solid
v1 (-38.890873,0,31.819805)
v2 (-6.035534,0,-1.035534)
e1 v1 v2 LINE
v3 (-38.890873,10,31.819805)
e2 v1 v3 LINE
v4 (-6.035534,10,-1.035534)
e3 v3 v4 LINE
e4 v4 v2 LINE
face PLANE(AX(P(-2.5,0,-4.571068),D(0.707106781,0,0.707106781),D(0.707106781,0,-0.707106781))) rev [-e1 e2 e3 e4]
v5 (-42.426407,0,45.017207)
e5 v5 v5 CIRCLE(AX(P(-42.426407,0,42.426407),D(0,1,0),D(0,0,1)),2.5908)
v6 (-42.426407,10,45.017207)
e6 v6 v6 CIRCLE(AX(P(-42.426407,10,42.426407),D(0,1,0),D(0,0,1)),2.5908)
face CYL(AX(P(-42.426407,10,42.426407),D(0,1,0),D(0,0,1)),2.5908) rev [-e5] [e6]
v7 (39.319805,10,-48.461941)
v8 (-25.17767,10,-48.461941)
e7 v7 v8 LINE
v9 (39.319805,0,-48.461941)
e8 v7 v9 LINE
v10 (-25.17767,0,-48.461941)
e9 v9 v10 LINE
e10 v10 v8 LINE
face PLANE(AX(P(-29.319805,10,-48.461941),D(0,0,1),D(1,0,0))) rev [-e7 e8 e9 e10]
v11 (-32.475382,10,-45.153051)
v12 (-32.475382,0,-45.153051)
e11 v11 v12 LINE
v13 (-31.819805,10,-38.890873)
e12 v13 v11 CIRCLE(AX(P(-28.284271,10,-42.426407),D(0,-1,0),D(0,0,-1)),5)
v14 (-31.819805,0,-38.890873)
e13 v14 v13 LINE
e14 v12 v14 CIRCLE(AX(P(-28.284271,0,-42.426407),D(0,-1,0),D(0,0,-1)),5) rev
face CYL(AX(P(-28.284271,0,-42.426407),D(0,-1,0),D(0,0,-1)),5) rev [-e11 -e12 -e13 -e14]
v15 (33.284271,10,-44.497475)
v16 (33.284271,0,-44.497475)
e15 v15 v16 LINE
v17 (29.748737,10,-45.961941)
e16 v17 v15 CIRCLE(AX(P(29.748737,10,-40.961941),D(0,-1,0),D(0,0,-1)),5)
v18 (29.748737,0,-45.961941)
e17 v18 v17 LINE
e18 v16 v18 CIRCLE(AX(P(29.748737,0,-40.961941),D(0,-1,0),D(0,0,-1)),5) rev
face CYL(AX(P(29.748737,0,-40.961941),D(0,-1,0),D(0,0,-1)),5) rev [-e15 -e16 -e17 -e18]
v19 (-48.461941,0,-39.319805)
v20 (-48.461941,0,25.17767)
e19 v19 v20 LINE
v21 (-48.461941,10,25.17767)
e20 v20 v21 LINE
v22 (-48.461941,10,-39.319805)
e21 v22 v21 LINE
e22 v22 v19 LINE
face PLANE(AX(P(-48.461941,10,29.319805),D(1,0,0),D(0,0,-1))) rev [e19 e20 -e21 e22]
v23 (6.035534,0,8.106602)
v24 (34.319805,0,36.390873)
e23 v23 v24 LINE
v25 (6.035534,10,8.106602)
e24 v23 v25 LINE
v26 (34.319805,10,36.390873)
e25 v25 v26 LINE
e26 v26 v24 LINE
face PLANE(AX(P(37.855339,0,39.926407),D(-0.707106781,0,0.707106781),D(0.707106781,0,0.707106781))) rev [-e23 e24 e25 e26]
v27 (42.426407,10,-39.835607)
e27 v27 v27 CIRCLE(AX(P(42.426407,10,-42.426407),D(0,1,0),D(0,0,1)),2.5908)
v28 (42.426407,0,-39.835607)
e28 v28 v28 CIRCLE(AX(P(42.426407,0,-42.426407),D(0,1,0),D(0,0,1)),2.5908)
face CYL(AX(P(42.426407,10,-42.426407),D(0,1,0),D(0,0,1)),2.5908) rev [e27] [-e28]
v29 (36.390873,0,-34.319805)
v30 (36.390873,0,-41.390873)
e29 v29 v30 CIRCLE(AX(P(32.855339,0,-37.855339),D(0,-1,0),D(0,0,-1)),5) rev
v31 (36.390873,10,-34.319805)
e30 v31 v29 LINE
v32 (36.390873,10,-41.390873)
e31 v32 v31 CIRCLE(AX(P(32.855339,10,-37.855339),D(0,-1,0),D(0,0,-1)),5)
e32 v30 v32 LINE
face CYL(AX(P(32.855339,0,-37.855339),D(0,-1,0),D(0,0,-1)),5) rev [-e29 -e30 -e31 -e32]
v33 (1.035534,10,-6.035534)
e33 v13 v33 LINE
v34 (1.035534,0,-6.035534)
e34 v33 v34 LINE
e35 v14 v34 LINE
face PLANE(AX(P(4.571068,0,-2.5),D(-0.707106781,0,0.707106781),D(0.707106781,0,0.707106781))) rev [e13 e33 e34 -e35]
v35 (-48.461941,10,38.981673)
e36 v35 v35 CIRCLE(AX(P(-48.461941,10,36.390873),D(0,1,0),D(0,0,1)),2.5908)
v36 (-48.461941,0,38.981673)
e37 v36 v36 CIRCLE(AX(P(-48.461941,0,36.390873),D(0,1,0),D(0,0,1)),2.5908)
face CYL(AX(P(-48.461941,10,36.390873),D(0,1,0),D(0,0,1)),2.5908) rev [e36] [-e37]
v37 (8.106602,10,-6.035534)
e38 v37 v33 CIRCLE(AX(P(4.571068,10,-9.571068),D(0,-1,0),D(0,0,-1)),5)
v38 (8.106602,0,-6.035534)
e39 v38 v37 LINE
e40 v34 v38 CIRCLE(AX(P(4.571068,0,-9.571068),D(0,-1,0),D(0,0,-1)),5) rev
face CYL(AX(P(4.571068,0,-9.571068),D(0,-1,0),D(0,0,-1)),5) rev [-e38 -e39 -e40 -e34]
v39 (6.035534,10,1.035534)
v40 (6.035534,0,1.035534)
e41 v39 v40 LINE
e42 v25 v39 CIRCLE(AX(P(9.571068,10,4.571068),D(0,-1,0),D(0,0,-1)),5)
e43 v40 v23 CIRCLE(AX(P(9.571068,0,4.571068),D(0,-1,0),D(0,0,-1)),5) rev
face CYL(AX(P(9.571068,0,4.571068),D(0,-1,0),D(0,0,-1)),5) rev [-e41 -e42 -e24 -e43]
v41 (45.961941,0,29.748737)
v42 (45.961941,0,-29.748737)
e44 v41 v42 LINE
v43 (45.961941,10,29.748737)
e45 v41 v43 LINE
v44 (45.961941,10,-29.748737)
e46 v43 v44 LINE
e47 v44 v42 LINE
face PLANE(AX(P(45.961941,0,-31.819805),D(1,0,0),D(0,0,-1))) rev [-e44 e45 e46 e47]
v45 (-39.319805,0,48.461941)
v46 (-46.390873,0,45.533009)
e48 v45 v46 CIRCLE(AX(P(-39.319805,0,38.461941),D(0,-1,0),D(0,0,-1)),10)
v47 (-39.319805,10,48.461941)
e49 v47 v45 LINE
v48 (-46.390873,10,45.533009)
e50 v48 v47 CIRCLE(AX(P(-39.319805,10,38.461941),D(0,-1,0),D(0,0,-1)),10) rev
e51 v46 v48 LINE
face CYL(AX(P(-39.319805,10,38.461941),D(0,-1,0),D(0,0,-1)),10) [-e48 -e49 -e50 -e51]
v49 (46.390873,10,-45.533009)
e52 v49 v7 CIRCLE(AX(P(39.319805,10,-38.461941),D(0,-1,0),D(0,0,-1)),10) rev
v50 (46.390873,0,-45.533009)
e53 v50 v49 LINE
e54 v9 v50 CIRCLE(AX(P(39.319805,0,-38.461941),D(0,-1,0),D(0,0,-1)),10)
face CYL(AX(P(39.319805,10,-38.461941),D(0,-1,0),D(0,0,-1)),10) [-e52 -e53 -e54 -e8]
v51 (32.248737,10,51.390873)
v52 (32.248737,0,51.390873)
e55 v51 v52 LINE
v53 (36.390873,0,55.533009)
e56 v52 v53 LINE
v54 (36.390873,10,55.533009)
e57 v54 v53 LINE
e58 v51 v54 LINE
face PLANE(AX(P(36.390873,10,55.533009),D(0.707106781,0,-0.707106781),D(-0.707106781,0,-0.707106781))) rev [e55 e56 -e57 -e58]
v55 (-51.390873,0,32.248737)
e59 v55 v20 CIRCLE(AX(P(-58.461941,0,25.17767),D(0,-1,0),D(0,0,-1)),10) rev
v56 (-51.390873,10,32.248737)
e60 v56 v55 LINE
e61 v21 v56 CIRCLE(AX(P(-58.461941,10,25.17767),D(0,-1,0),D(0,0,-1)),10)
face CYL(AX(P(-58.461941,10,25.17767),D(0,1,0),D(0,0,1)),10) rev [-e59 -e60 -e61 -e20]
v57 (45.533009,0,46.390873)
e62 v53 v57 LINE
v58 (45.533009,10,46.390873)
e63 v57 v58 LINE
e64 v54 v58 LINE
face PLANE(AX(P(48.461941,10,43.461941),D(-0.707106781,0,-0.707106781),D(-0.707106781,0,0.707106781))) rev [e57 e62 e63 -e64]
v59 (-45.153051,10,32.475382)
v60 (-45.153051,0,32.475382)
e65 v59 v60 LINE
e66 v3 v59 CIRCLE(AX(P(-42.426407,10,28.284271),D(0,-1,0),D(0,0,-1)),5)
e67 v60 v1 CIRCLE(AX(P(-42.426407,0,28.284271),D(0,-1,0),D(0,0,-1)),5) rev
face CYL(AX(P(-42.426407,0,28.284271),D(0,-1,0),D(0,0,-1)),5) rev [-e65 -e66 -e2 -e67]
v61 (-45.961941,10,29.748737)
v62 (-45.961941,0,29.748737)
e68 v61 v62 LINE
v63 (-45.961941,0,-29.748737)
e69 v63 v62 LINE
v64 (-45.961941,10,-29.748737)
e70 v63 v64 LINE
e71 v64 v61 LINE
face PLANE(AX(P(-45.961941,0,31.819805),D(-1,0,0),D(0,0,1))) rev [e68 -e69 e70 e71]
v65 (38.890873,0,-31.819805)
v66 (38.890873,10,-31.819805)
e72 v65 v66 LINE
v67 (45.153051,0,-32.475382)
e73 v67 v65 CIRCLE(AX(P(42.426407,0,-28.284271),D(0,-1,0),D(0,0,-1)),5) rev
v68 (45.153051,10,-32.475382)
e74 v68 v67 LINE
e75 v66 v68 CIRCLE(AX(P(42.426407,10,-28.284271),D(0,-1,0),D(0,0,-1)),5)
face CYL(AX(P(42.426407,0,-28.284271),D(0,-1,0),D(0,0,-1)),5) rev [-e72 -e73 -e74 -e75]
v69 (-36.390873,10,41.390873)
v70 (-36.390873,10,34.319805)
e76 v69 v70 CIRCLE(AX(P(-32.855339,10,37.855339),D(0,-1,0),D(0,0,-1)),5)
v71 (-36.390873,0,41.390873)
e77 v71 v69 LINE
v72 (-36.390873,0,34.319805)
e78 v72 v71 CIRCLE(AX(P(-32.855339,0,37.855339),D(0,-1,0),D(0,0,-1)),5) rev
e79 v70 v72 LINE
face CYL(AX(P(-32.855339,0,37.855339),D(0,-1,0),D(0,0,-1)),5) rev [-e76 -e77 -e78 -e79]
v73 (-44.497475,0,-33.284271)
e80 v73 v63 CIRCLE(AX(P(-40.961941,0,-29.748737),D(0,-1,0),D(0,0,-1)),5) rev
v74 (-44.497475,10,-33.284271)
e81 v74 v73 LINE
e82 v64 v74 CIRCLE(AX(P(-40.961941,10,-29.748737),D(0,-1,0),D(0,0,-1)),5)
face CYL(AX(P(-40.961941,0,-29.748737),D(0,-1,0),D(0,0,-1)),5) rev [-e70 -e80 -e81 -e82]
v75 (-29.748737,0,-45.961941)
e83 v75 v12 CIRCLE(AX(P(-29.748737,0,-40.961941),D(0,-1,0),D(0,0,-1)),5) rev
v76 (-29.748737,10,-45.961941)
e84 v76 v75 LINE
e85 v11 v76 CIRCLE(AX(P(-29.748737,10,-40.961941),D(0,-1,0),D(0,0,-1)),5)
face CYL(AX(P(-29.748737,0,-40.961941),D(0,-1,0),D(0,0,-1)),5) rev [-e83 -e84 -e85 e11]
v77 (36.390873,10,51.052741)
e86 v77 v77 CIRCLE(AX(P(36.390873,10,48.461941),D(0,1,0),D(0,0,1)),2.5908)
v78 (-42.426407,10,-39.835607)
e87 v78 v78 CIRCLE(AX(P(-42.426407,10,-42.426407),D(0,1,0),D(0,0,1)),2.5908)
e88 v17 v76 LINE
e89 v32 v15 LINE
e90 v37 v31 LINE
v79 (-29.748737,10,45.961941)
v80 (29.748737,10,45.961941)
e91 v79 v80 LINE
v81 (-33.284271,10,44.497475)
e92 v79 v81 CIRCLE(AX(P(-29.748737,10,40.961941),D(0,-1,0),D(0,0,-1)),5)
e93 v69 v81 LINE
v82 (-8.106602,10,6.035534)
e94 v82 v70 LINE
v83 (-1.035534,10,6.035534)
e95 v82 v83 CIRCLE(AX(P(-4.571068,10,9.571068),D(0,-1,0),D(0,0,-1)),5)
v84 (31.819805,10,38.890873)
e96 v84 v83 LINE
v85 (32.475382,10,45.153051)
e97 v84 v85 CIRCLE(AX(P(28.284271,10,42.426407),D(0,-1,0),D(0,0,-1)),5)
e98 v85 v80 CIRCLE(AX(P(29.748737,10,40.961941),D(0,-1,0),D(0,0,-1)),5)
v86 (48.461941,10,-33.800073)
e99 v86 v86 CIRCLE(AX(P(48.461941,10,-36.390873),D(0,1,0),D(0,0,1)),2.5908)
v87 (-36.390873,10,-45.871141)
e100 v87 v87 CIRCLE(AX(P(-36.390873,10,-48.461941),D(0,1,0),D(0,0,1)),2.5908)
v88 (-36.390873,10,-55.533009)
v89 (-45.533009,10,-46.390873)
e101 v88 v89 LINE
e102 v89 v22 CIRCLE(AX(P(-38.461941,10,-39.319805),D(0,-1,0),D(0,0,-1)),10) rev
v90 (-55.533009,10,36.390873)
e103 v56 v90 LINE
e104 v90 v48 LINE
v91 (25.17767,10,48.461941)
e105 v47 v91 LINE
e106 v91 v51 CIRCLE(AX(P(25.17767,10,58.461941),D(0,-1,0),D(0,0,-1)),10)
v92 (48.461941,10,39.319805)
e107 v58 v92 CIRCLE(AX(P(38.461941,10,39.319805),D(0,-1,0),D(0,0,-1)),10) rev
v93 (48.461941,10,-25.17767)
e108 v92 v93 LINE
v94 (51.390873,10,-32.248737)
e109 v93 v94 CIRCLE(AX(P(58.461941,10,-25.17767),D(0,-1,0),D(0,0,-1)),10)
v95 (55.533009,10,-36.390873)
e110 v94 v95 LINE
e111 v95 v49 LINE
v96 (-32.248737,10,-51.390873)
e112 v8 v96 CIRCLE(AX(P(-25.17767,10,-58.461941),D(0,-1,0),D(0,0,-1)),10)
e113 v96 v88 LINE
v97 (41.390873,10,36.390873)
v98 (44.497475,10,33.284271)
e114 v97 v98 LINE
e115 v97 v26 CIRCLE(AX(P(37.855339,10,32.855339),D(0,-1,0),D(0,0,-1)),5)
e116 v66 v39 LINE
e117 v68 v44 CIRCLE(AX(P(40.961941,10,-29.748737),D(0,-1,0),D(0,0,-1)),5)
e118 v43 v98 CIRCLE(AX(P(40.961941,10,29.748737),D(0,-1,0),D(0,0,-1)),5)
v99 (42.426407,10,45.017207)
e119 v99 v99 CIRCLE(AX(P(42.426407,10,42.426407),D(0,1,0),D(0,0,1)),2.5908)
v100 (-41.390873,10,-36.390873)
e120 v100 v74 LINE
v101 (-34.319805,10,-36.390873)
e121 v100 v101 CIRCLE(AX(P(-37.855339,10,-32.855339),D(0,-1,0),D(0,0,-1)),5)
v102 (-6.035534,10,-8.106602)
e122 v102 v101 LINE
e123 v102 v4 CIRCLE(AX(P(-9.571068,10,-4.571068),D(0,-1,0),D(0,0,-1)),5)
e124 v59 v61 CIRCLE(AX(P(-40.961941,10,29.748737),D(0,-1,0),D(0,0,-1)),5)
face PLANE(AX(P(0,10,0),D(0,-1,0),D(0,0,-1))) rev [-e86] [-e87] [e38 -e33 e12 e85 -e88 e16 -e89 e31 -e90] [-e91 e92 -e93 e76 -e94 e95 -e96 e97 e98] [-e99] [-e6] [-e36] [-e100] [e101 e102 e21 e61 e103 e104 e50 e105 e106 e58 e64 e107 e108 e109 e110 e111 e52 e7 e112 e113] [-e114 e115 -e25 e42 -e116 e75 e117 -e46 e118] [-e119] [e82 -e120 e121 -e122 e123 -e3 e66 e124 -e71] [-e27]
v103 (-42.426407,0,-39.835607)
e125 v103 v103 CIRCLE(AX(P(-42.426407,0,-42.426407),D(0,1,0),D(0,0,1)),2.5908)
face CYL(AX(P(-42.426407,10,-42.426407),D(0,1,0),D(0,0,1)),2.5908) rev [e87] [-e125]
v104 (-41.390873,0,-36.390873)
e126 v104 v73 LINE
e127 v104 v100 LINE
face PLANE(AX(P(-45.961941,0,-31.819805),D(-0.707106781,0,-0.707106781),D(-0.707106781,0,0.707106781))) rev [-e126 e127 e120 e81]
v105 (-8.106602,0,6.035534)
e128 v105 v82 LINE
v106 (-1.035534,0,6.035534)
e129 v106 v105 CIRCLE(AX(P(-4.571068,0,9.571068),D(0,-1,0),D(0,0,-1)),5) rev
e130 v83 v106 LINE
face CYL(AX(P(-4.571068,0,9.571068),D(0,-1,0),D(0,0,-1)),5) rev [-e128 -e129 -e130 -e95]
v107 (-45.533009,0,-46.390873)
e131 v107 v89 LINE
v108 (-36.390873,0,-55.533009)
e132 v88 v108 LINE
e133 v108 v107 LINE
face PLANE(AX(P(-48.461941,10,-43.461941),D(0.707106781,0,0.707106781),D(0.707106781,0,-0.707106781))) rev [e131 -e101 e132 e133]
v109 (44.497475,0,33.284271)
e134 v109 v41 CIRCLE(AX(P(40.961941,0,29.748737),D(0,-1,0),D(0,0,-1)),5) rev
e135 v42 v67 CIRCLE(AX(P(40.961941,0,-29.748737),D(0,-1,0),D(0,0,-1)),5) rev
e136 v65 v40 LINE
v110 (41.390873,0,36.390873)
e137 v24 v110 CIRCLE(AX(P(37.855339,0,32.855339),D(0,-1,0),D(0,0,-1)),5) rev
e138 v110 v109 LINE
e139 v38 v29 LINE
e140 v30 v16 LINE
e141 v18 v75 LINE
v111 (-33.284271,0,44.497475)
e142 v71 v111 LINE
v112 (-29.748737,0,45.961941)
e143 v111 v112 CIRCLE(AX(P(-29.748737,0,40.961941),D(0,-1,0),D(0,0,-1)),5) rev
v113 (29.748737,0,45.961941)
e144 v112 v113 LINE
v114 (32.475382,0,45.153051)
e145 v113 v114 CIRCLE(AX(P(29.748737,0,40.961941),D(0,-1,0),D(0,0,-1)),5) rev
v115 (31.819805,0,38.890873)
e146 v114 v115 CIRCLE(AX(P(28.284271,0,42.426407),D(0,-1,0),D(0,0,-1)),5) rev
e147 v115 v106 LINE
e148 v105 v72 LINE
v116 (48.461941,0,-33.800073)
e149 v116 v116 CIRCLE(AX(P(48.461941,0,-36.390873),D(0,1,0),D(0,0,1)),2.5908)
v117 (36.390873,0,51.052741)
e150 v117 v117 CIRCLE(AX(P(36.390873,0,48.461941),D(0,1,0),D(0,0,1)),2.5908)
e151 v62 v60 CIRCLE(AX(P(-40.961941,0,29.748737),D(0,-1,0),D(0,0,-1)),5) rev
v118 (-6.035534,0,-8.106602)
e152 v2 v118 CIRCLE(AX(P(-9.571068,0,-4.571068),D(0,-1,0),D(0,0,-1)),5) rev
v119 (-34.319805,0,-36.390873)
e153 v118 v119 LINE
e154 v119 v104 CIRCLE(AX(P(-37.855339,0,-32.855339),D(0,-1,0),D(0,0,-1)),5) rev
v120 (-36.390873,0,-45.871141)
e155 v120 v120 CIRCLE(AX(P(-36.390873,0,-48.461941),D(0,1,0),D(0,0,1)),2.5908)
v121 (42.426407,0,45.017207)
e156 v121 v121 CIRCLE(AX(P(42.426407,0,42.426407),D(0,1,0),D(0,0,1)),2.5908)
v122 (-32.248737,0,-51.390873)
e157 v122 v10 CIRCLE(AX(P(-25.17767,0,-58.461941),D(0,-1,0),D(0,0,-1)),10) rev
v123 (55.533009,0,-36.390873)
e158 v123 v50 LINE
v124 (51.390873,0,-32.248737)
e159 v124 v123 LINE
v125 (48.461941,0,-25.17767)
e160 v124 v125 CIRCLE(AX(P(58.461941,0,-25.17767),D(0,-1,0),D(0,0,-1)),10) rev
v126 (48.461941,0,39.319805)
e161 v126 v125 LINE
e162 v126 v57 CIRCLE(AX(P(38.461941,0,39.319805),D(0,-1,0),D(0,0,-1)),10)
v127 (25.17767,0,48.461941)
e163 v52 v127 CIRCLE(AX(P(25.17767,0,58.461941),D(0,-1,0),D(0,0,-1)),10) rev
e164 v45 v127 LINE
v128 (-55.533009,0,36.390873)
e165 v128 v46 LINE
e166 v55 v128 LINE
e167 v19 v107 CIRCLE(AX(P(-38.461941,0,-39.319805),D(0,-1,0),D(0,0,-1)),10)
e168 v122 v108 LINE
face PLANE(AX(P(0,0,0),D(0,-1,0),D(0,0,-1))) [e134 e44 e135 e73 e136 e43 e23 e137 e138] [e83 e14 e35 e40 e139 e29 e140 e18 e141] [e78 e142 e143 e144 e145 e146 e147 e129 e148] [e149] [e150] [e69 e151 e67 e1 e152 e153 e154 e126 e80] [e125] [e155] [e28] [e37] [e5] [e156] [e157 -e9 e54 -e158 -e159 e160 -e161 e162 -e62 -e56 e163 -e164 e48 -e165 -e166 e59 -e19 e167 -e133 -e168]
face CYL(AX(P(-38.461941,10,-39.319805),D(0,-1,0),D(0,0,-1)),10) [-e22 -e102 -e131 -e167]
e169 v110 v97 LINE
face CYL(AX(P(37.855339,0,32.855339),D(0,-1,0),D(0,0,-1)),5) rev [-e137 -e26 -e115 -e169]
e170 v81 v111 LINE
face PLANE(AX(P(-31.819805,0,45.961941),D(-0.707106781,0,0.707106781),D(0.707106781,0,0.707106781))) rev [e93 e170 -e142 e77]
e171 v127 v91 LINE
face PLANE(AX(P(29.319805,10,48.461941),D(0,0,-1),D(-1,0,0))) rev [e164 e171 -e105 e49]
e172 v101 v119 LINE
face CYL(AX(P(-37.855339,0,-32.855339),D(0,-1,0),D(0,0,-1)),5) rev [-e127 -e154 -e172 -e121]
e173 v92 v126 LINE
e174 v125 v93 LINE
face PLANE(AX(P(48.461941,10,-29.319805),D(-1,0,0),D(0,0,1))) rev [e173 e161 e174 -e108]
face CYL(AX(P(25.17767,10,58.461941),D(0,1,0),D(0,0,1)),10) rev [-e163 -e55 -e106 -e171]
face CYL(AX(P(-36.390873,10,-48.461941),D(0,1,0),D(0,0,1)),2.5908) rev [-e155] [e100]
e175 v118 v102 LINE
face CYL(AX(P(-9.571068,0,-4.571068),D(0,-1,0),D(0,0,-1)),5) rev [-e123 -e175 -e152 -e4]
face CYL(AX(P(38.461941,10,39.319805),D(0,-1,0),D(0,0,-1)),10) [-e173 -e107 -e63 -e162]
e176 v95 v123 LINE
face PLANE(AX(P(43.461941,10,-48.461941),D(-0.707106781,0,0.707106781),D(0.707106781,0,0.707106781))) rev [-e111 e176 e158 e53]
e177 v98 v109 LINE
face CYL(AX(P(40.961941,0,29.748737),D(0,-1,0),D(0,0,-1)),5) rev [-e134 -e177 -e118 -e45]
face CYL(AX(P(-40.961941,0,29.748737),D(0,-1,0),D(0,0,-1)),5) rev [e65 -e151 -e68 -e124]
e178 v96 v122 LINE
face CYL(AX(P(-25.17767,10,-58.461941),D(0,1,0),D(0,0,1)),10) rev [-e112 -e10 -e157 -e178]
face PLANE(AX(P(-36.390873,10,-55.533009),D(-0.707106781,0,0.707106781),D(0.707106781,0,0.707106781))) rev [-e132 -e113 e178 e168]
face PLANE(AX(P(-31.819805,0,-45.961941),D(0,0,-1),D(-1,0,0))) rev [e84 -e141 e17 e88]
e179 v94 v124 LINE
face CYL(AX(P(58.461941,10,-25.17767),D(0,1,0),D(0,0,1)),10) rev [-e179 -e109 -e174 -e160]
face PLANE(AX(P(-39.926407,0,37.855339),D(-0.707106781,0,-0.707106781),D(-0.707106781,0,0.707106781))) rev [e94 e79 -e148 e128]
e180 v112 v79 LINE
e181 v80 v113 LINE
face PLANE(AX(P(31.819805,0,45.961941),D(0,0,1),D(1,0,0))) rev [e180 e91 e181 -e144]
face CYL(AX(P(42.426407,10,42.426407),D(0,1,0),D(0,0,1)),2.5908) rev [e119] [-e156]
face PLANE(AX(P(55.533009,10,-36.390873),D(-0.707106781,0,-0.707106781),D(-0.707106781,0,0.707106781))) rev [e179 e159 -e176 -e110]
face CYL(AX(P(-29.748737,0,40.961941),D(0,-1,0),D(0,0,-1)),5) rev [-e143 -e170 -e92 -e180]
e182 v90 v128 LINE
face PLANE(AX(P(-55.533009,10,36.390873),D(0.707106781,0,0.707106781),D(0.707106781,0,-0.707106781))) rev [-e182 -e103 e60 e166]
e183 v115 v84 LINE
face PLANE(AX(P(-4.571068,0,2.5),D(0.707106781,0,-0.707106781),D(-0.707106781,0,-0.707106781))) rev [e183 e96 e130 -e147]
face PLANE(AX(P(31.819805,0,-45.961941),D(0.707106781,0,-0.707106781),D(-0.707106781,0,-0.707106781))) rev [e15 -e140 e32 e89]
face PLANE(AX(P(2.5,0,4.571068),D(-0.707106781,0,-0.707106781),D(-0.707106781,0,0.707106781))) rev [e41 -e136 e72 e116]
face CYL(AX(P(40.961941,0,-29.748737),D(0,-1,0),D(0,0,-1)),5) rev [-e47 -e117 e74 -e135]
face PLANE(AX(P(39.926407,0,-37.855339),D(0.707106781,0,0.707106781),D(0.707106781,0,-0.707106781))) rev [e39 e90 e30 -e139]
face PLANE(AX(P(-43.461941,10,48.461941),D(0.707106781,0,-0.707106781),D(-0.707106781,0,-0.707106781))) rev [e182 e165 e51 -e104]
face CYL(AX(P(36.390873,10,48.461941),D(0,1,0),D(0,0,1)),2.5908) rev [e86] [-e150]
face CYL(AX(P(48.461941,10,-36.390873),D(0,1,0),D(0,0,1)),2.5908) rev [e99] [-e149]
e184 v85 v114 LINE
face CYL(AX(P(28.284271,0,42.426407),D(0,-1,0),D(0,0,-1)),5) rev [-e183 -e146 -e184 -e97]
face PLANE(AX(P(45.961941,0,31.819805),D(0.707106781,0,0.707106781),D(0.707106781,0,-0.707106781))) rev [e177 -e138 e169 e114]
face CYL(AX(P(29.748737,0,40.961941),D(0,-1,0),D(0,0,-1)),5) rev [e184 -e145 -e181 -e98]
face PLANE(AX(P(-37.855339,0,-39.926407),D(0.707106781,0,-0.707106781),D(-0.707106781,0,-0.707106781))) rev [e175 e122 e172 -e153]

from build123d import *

# Parameters (mm, degrees)
BOSS_EXTRUDE1_DEPTH        = 10
CUT_EXTRUDE1_DEPTH         = 80.169628557
FILLET4_R                  = 5
CIRPATTERN6_COUNT          = 4
FILLET4_OF_CIRPATTERN6_R   = 5
FILLET5_R                  = 10
F_6_0_204_DIAMETER_HOLE1_D = 5.1816
CIRPATTERN7_COUNT          = 4


with BuildPart() as part:
    # Sketch1 → Boss-Extrude1 (new body)
    with BuildSketch(Plane(origin=(0, 0, 0), x_dir=(1, 0, 0), z_dir=(0, 1, 0))):
        Polygon((-48.461940777, 43.461940777), (-36.390872965, 55.533008589), (-29.319805153, 48.461940777), (43.461940777, 48.461940777), (55.533008589, 36.390872965), (48.461940777, 29.319805153), (48.461940777, -43.461940777), (36.390872965, -55.533008589), (29.319805153, -48.461940777), (-43.461940777, -48.461940777), (-55.533008589, -36.390872965), (-48.461940777, -29.319805153), align=None)
    extrude(amount=BOSS_EXTRUDE1_DEPTH)

    # Sketch2 → Cut-Extrude1 (cut, through all)
    with BuildSketch(Plane(origin=(0, 10, 0), x_dir=(1, 0, 0), z_dir=(0, 1, 0))):
        Polygon((-2.5, 4.571067812), (-42.426406871, -35.355339059), (-45.961940777, -31.819805153), (-45.961940777, 31.819805153), (-37.855339059, 39.926406871), align=None)
    cut_extrude1 = extrude(amount=-CUT_EXTRUDE1_DEPTH, mode=Mode.SUBTRACT)

    # Fillet4
    # the kernel refuses this fillet: 5 mm, written as the material it adds along each edge
    with BuildSketch(Plane(origin=(-37.855339059, 10, -39.926406871), x_dir=(-0.7071067811865468, 0, 0.7071067811865482), z_dir=(0, -1, 0)), Plane(origin=(-2.5, 10, -4.571067812), x_dir=(-0.7071067811865471, 0, -0.707106781186548), z_dir=(0, -1, 0))) as fillet4_piece_1:
        with BuildLine():
            CenterArc((FILLET4_R, -FILLET4_R), FILLET4_R, 90, 90)
            Line((0, -FILLET4_R), (0, 0))
            Line((0, 0), (FILLET4_R, 0))
        make_face()
    extrude(amount=10)
    with BuildSketch(Plane(origin=(-45.961940777, 10, 31.819805153), x_dir=(0.7071067811865467, 0, 0.7071067811865483), z_dir=(0, -1, 0)), Plane(origin=(-45.961940777, 10, -31.819805153), x_dir=(0, 0, 1), z_dir=(0, -1, 0))) as fillet4_piece_2:
        with BuildLine():
            CenterArc((FILLET4_R * 0.414213562373, -FILLET4_R), FILLET4_R, 90, 45)
            Line((-FILLET4_R * 0.292893218813, -FILLET4_R * 0.292893218813), (0, 0))
            Line((0, 0), (FILLET4_R * 0.414213562373, 0))
        make_face()
    extrude(amount=10)
    with BuildSketch(Plane(origin=(-42.426406871, 10, 35.355339059), x_dir=(-0.707106781186546, 0, -0.7071067811865489), z_dir=(0, -1, 0))) as fillet4_piece_3:
        with BuildLine():
            CenterArc((FILLET4_R, FILLET4_R), FILLET4_R, 180, 90)
            Line((0, FILLET4_R), (0, 0))
            Line((0, 0), (FILLET4_R, 0))
        make_face()
    extrude(amount=10)

    # CirPattern6: Cut-Extrude1 ×4 about axis
    cirpattern6_axis = Axis((0, 0, 0), (0, 1, 0))
    for i in range(1, CIRPATTERN6_COUNT):
        add(cut_extrude1.rotate(cirpattern6_axis, i * 360 / CIRPATTERN6_COUNT), mode=Mode.SUBTRACT)

    # Fillet4 of CirPattern6
    # the kernel refuses this fillet: 5 mm, written as the material it adds along each edge
    with BuildSketch(Plane(origin=(-39.926406871, 10, 37.855339059), x_dir=(0.7071067811865476, 0, -0.7071067811865476), z_dir=(0, -1, 0)), Plane(origin=(37.855339059, 10, 39.926406871), x_dir=(-0.7071067811865475, 0, -0.7071067811865475), z_dir=(0, -1, 0)), Plane(origin=(39.926406871, 10, -37.855339059), x_dir=(-0.7071067811865476, 0, 0.7071067811865476), z_dir=(0, -1, 0)), Plane(origin=(-35.355339059, 10, -42.426406871), x_dir=(0.7071067811865486, 0, -0.7071067811865465), z_dir=(0, -1, 0))) as fillet4_of_cirpattern6_piece_1:
        with BuildLine():
            CenterArc((FILLET4_OF_CIRPATTERN6_R, FILLET4_OF_CIRPATTERN6_R), FILLET4_OF_CIRPATTERN6_R, 180, 90)
            Line((0, FILLET4_OF_CIRPATTERN6_R), (0, 0))
            Line((0, 0), (FILLET4_OF_CIRPATTERN6_R, 0))
        make_face()
    extrude(amount=10)
    with BuildSketch(Plane(origin=(-4.571067812, 10, 2.5), x_dir=(-0.707106781186548, 0, 0.7071067811865469), z_dir=(0, -1, 0)), Plane(origin=(35.355339059, 10, 42.426406871), x_dir=(-0.7071067811865479, 0, -0.7071067811865471), z_dir=(0, -1, 0)), Plane(origin=(2.5, 10, 4.571067812), x_dir=(0.7071067811865474, 0, 0.7071067811865478), z_dir=(0, -1, 0)), Plane(origin=(42.426406871, 10, -35.355339059), x_dir=(-0.7071067811865471, 0, 0.7071067811865479), z_dir=(0, -1, 0)), Plane(origin=(4.571067812, 10, -2.5), x_dir=(0.7071067811865478, 0, -0.7071067811865472), z_dir=(0, -1, 0))) as fillet4_of_cirpattern6_piece_2:
        with BuildLine():
            CenterArc((FILLET4_OF_CIRPATTERN6_R, -FILLET4_OF_CIRPATTERN6_R), FILLET4_OF_CIRPATTERN6_R, 90, 90)
            Line((0, -FILLET4_OF_CIRPATTERN6_R), (0, 0))
            Line((0, 0), (FILLET4_OF_CIRPATTERN6_R, 0))
        make_face()
    extrude(amount=10)
    with BuildSketch(Plane(origin=(31.819805153, 10, 45.961940777), x_dir=(-1, 0, 0), z_dir=(0, -1, 0)), Plane(origin=(-31.819805153, 10, 45.961940777), x_dir=(-0.7071067811865483, 0, -0.7071067811865467), z_dir=(0, -1, 0)), Plane(origin=(45.961940777, 10, -31.819805153), x_dir=(0, 0, 1), z_dir=(0, -1, 0)), Plane(origin=(45.961940777, 10, 31.819805153), x_dir=(-0.7071067811865458, 0, 0.7071067811865492), z_dir=(0, -1, 0)), Plane(origin=(-31.819805153, 10, -45.961940777), x_dir=(1, 0, 0), z_dir=(0, -1, 0)), Plane(origin=(31.819805153, 10, -45.961940777), x_dir=(0.7071067811865492, 0, 0.7071067811865458), z_dir=(0, -1, 0))) as fillet4_of_cirpattern6_piece_3:
        with BuildLine():
            CenterArc((FILLET4_OF_CIRPATTERN6_R * 0.414213562373, FILLET4_OF_CIRPATTERN6_R), FILLET4_OF_CIRPATTERN6_R, 225, 45)
            Line((-FILLET4_OF_CIRPATTERN6_R * 0.292893218813, FILLET4_OF_CIRPATTERN6_R * 0.292893218813), (0, 0))
            Line((0, 0), (FILLET4_OF_CIRPATTERN6_R * 0.414213562373, 0))
        make_face()
    extrude(amount=10)

    # Fillet5
    fillet5_edges = [part.edges().sort_by_distance(p)[0] for p in [
        (-48.461940777, 5, -43.461940777),
        (-29.319805153, 5, -48.461940777),
        (43.461940777, 5, -48.461940777),
        (48.461940777, 5, -29.319805153),
        (48.461940777, 5, 43.461940777),
        (29.319805153, 5, 48.461940777),
        (-43.461940777, 5, 48.461940777),
        (-48.461940777, 5, 29.319805153),
    ]]
    fillet(fillet5_edges, radius=FILLET5_R)

    # #6 (0.204) Diameter Hole1 (through all)
    with Locations(Plane(origin=(0, 10, 0), x_dir=(1, 0, 0), z_dir=(0, 1, 0))):
        with Locations((-42.426406871, 42.426406871), (-36.390872965, 48.461940777)):
            f_6_0_204_diameter_hole1 = Hole(F_6_0_204_DIAMETER_HOLE1_D / 2)

    # CirPattern7: #6 (0.204) Diameter Hole1 ×4 about axis
    cirpattern7_axis = Axis((0, 0, 0), (0, 1, 0))
    for i in range(1, CIRPATTERN7_COUNT):
        add(f_6_0_204_diameter_hole1.rotate(cirpattern7_axis, i * 360 / CIRPATTERN7_COUNT), mode=Mode.SUBTRACT)


solid = part.part
